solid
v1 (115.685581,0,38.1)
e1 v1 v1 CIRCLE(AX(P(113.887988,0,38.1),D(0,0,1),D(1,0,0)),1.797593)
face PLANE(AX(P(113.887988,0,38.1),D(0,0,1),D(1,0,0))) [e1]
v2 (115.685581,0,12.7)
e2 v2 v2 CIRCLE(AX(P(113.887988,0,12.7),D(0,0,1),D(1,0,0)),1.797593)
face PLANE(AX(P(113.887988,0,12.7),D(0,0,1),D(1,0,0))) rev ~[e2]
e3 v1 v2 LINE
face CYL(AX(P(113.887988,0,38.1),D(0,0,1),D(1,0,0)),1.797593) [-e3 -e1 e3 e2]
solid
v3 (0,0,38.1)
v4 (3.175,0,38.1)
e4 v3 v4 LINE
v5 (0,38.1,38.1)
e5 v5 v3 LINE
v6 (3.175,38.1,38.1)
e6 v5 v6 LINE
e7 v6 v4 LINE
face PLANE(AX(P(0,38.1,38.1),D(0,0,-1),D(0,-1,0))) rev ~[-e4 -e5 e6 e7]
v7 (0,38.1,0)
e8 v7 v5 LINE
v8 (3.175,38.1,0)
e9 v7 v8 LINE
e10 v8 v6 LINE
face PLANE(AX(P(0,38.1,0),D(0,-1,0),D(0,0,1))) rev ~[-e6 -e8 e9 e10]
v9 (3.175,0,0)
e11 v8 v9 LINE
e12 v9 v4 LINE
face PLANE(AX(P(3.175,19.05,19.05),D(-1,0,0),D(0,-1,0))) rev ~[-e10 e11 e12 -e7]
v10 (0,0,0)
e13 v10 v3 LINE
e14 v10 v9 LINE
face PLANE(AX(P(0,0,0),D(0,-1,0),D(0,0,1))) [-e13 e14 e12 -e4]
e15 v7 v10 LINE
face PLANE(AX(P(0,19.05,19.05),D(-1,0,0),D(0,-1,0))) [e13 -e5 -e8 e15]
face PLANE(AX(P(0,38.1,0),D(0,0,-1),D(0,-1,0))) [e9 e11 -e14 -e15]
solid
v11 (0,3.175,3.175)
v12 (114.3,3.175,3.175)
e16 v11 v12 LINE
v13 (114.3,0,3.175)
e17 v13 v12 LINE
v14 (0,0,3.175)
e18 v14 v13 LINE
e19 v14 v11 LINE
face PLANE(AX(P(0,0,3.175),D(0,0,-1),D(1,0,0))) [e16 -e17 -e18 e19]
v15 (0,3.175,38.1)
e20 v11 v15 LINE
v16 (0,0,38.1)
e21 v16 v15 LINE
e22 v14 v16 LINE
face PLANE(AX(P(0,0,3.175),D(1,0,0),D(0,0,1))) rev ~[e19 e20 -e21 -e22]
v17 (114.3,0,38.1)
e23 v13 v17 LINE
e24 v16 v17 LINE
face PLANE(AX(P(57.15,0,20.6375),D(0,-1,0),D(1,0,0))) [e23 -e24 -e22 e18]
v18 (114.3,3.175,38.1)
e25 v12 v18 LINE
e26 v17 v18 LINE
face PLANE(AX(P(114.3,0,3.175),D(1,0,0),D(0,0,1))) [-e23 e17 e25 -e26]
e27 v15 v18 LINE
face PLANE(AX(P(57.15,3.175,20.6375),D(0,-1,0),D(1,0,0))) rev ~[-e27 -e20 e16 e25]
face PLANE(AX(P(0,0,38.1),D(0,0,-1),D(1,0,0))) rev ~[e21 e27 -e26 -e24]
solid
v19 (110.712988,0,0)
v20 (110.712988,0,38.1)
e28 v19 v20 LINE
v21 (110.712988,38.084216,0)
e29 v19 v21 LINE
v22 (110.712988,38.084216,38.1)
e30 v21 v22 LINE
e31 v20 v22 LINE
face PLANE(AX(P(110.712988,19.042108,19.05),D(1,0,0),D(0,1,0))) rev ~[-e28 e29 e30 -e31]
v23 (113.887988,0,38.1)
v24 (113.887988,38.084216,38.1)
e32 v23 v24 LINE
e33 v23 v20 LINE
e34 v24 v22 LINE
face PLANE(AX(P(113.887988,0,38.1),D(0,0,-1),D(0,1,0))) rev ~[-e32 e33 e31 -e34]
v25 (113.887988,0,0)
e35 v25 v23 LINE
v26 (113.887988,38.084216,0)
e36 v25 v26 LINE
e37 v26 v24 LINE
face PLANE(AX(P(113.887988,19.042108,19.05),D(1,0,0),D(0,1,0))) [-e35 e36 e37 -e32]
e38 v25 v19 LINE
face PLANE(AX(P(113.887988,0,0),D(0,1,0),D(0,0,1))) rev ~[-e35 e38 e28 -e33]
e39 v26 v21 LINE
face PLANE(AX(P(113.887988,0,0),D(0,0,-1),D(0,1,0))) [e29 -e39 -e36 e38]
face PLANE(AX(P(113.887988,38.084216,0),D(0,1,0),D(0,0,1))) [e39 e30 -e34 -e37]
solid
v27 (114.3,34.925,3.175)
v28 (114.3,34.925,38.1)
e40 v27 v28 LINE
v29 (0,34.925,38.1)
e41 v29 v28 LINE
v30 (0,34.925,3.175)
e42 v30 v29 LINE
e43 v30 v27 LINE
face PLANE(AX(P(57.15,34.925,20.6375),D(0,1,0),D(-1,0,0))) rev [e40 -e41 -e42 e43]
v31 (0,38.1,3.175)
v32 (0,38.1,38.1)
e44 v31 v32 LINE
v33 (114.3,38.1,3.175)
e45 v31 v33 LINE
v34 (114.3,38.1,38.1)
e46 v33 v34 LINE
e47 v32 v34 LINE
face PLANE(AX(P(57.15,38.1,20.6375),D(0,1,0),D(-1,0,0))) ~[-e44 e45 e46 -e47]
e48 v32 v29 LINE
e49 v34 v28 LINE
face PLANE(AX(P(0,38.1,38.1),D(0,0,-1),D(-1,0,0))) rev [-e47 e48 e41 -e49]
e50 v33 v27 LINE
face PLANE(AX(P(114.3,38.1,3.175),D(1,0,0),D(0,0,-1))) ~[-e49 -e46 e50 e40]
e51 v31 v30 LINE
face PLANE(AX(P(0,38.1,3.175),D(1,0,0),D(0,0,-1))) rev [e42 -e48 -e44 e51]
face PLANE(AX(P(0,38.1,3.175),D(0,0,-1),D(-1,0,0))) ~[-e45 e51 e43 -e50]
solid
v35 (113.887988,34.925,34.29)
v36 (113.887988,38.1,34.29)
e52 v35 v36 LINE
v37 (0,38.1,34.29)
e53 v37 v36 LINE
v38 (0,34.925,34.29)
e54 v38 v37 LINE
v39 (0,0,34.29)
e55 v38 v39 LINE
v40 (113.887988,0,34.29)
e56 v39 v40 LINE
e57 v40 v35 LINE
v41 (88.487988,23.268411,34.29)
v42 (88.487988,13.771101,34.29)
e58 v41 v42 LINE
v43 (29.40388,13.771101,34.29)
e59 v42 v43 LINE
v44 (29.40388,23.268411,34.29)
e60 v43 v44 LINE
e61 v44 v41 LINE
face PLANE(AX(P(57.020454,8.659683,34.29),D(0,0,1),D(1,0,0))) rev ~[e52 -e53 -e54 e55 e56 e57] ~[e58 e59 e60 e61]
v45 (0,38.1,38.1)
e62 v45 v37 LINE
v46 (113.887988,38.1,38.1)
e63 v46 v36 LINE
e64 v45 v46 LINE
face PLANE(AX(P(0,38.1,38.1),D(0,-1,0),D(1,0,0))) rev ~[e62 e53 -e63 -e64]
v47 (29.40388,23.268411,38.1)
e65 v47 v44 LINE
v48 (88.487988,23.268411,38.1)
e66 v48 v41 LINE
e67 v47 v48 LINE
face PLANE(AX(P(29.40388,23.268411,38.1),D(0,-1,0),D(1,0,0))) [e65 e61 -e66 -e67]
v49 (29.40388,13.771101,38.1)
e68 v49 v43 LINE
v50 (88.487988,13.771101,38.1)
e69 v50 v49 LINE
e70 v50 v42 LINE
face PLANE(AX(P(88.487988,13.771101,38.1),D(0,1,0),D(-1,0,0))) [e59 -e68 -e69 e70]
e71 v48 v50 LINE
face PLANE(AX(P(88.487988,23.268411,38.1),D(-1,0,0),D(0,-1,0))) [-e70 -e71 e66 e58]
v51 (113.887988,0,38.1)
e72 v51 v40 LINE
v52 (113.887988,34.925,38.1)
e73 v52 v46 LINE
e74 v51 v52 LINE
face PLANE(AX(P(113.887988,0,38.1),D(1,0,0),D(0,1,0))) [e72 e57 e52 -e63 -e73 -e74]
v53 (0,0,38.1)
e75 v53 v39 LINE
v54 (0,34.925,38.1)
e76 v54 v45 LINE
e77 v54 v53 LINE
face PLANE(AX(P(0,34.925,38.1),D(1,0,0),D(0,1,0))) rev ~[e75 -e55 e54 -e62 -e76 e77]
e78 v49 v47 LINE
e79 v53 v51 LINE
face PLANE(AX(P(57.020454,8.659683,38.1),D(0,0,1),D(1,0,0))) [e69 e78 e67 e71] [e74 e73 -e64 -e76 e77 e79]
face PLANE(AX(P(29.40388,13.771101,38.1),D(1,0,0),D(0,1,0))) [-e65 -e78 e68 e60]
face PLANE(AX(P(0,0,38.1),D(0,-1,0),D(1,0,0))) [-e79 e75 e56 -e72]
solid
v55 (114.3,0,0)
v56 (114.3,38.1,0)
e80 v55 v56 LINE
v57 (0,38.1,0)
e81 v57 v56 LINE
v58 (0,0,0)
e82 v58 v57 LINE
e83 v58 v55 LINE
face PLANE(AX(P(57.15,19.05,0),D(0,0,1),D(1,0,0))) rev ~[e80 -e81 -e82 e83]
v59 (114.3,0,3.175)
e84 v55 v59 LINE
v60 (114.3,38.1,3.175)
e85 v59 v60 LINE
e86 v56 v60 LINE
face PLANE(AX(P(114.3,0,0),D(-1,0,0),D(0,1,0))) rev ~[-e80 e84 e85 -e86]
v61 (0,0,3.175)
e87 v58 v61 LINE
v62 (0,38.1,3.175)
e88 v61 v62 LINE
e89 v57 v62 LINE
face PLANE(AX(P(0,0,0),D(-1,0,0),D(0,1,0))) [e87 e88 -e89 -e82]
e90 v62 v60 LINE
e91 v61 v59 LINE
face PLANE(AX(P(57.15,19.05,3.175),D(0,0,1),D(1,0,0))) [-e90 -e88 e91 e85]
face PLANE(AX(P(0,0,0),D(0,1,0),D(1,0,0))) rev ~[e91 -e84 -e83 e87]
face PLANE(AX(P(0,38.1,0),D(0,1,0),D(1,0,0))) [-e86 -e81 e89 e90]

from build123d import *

# Parameters (mm, degrees)
F0_W      = 114.3
F0_H      = 38.1
F1_DEPTH  = 3.175
F2_W      = 114.3
F2_H      = 34.925
F3_DEPTH  = 3.175
F8_W      = 113.8879880309
F8_H      = 3.175
F9_DEPTH  = 3.81
F10_W     = 38.1
F10_H     = 38.1
F11_DEPTH = 3.175
F12_W     = 38.0842164159
F12_H     = 38.1
F13_DEPTH = 3.175
F8_W_2    = 59.0841079511
F8_H_2    = 4.218410936
F8_H_3    = 5.2788990989
F14_DEPTH = 3.175
F15_R     = 1.7975926973
F16_DEPTH = 25.4


# Not quite as in the source:
# - a length typed as a fraction of an inch, garbled in the dataset ("3 / 203.2 mm" for 3/8 in), is restored


with BuildPart() as f1:
    # F0 (on Top) → F1 (new body)
    with BuildSketch(Plane.XY):
        with Locations((57.15, 19.05)):
            Rectangle(F0_W, F0_H)
    extrude(amount=F1_DEPTH)

    # F8 (on face) → F14 (cut)
    with BuildSketch(Plane.XY.offset(38.1)):
        with Locations((58.9459340554, 21.159205468)):
            Rectangle(F8_W_2, F8_H_2)
        with Locations((58.9459340554, 16.4105504505)):
            Rectangle(F8_W_2, F8_H_3)
    extrude(amount=-F14_DEPTH, mode=Mode.SUBTRACT)


with BuildPart() as f3:
    # F2 (on face) → F3 (new body)
    with BuildSketch(Plane.XZ):
        with Locations((57.15, 20.6375)):
            Rectangle(F2_W, F2_H)
    extrude(amount=-F3_DEPTH)


with BuildPart() as f7_1:
    # F7: instance of F3
    add(f3.part.mirror(Plane(origin=(57.15, 19.05, 3.175), x_dir=(1, 0, 0), z_dir=(0, -1, 0))))


with BuildPart() as f9:
    # F8 (on face) → F9 (new body)
    with BuildSketch(Plane.XY.offset(38.1)):
        Polygon((4.0038800798, 19.05), (0, 19.05), (0, 0), (113.8879880309, 0), (113.8879880309, 19.05), (88.4879880309, 19.05), (88.4879880309, 13.7711009011), (29.4038800798, 13.7711009011), (29.4038800798, 19.05), align=None)
        with Locations((56.9439940155, 36.5125)):
            Rectangle(F8_W, F8_H)
        Polygon((113.8879880309, 34.925), (0, 34.925), (0, 19.05), (4.0038800798, 19.05), (29.4038800798, 19.05), (29.4038800798, 23.268410936), (88.4879880309, 23.268410936), (88.4879880309, 19.05), (113.8879880309, 19.05), align=None)
    extrude(amount=-F9_DEPTH)


with BuildPart() as f11:
    # F10 (on face) → F11 (new body)
    with BuildSketch(Plane(origin=(0, 0, 0), x_dir=(0, -1, 0), z_dir=(-1, 0, 0))):
        with Locations((-19.05, 19.05)):
            Rectangle(F10_W, F10_H)
    extrude(amount=-F11_DEPTH)


with BuildPart() as f13:
    # F12 (on face) → F13 (new body)
    with BuildSketch(Plane.YZ.offset(113.8879880309)):
        with Locations((19.0421082079, 19.05)):
            Rectangle(F12_W, F12_H)
    extrude(amount=-F13_DEPTH)


with BuildPart() as f16:
    # F15 (on face) → F16 (new body)
    with BuildSketch(Plane.XY.offset(38.1)):
        with Locations((113.8879880309, 0)):
            Circle(F15_R)
    extrude(amount=-F16_DEPTH)


solid = Compound([f1.part, f3.part, f7_1.part, f9.part, f11.part, f13.part, f16.part])
